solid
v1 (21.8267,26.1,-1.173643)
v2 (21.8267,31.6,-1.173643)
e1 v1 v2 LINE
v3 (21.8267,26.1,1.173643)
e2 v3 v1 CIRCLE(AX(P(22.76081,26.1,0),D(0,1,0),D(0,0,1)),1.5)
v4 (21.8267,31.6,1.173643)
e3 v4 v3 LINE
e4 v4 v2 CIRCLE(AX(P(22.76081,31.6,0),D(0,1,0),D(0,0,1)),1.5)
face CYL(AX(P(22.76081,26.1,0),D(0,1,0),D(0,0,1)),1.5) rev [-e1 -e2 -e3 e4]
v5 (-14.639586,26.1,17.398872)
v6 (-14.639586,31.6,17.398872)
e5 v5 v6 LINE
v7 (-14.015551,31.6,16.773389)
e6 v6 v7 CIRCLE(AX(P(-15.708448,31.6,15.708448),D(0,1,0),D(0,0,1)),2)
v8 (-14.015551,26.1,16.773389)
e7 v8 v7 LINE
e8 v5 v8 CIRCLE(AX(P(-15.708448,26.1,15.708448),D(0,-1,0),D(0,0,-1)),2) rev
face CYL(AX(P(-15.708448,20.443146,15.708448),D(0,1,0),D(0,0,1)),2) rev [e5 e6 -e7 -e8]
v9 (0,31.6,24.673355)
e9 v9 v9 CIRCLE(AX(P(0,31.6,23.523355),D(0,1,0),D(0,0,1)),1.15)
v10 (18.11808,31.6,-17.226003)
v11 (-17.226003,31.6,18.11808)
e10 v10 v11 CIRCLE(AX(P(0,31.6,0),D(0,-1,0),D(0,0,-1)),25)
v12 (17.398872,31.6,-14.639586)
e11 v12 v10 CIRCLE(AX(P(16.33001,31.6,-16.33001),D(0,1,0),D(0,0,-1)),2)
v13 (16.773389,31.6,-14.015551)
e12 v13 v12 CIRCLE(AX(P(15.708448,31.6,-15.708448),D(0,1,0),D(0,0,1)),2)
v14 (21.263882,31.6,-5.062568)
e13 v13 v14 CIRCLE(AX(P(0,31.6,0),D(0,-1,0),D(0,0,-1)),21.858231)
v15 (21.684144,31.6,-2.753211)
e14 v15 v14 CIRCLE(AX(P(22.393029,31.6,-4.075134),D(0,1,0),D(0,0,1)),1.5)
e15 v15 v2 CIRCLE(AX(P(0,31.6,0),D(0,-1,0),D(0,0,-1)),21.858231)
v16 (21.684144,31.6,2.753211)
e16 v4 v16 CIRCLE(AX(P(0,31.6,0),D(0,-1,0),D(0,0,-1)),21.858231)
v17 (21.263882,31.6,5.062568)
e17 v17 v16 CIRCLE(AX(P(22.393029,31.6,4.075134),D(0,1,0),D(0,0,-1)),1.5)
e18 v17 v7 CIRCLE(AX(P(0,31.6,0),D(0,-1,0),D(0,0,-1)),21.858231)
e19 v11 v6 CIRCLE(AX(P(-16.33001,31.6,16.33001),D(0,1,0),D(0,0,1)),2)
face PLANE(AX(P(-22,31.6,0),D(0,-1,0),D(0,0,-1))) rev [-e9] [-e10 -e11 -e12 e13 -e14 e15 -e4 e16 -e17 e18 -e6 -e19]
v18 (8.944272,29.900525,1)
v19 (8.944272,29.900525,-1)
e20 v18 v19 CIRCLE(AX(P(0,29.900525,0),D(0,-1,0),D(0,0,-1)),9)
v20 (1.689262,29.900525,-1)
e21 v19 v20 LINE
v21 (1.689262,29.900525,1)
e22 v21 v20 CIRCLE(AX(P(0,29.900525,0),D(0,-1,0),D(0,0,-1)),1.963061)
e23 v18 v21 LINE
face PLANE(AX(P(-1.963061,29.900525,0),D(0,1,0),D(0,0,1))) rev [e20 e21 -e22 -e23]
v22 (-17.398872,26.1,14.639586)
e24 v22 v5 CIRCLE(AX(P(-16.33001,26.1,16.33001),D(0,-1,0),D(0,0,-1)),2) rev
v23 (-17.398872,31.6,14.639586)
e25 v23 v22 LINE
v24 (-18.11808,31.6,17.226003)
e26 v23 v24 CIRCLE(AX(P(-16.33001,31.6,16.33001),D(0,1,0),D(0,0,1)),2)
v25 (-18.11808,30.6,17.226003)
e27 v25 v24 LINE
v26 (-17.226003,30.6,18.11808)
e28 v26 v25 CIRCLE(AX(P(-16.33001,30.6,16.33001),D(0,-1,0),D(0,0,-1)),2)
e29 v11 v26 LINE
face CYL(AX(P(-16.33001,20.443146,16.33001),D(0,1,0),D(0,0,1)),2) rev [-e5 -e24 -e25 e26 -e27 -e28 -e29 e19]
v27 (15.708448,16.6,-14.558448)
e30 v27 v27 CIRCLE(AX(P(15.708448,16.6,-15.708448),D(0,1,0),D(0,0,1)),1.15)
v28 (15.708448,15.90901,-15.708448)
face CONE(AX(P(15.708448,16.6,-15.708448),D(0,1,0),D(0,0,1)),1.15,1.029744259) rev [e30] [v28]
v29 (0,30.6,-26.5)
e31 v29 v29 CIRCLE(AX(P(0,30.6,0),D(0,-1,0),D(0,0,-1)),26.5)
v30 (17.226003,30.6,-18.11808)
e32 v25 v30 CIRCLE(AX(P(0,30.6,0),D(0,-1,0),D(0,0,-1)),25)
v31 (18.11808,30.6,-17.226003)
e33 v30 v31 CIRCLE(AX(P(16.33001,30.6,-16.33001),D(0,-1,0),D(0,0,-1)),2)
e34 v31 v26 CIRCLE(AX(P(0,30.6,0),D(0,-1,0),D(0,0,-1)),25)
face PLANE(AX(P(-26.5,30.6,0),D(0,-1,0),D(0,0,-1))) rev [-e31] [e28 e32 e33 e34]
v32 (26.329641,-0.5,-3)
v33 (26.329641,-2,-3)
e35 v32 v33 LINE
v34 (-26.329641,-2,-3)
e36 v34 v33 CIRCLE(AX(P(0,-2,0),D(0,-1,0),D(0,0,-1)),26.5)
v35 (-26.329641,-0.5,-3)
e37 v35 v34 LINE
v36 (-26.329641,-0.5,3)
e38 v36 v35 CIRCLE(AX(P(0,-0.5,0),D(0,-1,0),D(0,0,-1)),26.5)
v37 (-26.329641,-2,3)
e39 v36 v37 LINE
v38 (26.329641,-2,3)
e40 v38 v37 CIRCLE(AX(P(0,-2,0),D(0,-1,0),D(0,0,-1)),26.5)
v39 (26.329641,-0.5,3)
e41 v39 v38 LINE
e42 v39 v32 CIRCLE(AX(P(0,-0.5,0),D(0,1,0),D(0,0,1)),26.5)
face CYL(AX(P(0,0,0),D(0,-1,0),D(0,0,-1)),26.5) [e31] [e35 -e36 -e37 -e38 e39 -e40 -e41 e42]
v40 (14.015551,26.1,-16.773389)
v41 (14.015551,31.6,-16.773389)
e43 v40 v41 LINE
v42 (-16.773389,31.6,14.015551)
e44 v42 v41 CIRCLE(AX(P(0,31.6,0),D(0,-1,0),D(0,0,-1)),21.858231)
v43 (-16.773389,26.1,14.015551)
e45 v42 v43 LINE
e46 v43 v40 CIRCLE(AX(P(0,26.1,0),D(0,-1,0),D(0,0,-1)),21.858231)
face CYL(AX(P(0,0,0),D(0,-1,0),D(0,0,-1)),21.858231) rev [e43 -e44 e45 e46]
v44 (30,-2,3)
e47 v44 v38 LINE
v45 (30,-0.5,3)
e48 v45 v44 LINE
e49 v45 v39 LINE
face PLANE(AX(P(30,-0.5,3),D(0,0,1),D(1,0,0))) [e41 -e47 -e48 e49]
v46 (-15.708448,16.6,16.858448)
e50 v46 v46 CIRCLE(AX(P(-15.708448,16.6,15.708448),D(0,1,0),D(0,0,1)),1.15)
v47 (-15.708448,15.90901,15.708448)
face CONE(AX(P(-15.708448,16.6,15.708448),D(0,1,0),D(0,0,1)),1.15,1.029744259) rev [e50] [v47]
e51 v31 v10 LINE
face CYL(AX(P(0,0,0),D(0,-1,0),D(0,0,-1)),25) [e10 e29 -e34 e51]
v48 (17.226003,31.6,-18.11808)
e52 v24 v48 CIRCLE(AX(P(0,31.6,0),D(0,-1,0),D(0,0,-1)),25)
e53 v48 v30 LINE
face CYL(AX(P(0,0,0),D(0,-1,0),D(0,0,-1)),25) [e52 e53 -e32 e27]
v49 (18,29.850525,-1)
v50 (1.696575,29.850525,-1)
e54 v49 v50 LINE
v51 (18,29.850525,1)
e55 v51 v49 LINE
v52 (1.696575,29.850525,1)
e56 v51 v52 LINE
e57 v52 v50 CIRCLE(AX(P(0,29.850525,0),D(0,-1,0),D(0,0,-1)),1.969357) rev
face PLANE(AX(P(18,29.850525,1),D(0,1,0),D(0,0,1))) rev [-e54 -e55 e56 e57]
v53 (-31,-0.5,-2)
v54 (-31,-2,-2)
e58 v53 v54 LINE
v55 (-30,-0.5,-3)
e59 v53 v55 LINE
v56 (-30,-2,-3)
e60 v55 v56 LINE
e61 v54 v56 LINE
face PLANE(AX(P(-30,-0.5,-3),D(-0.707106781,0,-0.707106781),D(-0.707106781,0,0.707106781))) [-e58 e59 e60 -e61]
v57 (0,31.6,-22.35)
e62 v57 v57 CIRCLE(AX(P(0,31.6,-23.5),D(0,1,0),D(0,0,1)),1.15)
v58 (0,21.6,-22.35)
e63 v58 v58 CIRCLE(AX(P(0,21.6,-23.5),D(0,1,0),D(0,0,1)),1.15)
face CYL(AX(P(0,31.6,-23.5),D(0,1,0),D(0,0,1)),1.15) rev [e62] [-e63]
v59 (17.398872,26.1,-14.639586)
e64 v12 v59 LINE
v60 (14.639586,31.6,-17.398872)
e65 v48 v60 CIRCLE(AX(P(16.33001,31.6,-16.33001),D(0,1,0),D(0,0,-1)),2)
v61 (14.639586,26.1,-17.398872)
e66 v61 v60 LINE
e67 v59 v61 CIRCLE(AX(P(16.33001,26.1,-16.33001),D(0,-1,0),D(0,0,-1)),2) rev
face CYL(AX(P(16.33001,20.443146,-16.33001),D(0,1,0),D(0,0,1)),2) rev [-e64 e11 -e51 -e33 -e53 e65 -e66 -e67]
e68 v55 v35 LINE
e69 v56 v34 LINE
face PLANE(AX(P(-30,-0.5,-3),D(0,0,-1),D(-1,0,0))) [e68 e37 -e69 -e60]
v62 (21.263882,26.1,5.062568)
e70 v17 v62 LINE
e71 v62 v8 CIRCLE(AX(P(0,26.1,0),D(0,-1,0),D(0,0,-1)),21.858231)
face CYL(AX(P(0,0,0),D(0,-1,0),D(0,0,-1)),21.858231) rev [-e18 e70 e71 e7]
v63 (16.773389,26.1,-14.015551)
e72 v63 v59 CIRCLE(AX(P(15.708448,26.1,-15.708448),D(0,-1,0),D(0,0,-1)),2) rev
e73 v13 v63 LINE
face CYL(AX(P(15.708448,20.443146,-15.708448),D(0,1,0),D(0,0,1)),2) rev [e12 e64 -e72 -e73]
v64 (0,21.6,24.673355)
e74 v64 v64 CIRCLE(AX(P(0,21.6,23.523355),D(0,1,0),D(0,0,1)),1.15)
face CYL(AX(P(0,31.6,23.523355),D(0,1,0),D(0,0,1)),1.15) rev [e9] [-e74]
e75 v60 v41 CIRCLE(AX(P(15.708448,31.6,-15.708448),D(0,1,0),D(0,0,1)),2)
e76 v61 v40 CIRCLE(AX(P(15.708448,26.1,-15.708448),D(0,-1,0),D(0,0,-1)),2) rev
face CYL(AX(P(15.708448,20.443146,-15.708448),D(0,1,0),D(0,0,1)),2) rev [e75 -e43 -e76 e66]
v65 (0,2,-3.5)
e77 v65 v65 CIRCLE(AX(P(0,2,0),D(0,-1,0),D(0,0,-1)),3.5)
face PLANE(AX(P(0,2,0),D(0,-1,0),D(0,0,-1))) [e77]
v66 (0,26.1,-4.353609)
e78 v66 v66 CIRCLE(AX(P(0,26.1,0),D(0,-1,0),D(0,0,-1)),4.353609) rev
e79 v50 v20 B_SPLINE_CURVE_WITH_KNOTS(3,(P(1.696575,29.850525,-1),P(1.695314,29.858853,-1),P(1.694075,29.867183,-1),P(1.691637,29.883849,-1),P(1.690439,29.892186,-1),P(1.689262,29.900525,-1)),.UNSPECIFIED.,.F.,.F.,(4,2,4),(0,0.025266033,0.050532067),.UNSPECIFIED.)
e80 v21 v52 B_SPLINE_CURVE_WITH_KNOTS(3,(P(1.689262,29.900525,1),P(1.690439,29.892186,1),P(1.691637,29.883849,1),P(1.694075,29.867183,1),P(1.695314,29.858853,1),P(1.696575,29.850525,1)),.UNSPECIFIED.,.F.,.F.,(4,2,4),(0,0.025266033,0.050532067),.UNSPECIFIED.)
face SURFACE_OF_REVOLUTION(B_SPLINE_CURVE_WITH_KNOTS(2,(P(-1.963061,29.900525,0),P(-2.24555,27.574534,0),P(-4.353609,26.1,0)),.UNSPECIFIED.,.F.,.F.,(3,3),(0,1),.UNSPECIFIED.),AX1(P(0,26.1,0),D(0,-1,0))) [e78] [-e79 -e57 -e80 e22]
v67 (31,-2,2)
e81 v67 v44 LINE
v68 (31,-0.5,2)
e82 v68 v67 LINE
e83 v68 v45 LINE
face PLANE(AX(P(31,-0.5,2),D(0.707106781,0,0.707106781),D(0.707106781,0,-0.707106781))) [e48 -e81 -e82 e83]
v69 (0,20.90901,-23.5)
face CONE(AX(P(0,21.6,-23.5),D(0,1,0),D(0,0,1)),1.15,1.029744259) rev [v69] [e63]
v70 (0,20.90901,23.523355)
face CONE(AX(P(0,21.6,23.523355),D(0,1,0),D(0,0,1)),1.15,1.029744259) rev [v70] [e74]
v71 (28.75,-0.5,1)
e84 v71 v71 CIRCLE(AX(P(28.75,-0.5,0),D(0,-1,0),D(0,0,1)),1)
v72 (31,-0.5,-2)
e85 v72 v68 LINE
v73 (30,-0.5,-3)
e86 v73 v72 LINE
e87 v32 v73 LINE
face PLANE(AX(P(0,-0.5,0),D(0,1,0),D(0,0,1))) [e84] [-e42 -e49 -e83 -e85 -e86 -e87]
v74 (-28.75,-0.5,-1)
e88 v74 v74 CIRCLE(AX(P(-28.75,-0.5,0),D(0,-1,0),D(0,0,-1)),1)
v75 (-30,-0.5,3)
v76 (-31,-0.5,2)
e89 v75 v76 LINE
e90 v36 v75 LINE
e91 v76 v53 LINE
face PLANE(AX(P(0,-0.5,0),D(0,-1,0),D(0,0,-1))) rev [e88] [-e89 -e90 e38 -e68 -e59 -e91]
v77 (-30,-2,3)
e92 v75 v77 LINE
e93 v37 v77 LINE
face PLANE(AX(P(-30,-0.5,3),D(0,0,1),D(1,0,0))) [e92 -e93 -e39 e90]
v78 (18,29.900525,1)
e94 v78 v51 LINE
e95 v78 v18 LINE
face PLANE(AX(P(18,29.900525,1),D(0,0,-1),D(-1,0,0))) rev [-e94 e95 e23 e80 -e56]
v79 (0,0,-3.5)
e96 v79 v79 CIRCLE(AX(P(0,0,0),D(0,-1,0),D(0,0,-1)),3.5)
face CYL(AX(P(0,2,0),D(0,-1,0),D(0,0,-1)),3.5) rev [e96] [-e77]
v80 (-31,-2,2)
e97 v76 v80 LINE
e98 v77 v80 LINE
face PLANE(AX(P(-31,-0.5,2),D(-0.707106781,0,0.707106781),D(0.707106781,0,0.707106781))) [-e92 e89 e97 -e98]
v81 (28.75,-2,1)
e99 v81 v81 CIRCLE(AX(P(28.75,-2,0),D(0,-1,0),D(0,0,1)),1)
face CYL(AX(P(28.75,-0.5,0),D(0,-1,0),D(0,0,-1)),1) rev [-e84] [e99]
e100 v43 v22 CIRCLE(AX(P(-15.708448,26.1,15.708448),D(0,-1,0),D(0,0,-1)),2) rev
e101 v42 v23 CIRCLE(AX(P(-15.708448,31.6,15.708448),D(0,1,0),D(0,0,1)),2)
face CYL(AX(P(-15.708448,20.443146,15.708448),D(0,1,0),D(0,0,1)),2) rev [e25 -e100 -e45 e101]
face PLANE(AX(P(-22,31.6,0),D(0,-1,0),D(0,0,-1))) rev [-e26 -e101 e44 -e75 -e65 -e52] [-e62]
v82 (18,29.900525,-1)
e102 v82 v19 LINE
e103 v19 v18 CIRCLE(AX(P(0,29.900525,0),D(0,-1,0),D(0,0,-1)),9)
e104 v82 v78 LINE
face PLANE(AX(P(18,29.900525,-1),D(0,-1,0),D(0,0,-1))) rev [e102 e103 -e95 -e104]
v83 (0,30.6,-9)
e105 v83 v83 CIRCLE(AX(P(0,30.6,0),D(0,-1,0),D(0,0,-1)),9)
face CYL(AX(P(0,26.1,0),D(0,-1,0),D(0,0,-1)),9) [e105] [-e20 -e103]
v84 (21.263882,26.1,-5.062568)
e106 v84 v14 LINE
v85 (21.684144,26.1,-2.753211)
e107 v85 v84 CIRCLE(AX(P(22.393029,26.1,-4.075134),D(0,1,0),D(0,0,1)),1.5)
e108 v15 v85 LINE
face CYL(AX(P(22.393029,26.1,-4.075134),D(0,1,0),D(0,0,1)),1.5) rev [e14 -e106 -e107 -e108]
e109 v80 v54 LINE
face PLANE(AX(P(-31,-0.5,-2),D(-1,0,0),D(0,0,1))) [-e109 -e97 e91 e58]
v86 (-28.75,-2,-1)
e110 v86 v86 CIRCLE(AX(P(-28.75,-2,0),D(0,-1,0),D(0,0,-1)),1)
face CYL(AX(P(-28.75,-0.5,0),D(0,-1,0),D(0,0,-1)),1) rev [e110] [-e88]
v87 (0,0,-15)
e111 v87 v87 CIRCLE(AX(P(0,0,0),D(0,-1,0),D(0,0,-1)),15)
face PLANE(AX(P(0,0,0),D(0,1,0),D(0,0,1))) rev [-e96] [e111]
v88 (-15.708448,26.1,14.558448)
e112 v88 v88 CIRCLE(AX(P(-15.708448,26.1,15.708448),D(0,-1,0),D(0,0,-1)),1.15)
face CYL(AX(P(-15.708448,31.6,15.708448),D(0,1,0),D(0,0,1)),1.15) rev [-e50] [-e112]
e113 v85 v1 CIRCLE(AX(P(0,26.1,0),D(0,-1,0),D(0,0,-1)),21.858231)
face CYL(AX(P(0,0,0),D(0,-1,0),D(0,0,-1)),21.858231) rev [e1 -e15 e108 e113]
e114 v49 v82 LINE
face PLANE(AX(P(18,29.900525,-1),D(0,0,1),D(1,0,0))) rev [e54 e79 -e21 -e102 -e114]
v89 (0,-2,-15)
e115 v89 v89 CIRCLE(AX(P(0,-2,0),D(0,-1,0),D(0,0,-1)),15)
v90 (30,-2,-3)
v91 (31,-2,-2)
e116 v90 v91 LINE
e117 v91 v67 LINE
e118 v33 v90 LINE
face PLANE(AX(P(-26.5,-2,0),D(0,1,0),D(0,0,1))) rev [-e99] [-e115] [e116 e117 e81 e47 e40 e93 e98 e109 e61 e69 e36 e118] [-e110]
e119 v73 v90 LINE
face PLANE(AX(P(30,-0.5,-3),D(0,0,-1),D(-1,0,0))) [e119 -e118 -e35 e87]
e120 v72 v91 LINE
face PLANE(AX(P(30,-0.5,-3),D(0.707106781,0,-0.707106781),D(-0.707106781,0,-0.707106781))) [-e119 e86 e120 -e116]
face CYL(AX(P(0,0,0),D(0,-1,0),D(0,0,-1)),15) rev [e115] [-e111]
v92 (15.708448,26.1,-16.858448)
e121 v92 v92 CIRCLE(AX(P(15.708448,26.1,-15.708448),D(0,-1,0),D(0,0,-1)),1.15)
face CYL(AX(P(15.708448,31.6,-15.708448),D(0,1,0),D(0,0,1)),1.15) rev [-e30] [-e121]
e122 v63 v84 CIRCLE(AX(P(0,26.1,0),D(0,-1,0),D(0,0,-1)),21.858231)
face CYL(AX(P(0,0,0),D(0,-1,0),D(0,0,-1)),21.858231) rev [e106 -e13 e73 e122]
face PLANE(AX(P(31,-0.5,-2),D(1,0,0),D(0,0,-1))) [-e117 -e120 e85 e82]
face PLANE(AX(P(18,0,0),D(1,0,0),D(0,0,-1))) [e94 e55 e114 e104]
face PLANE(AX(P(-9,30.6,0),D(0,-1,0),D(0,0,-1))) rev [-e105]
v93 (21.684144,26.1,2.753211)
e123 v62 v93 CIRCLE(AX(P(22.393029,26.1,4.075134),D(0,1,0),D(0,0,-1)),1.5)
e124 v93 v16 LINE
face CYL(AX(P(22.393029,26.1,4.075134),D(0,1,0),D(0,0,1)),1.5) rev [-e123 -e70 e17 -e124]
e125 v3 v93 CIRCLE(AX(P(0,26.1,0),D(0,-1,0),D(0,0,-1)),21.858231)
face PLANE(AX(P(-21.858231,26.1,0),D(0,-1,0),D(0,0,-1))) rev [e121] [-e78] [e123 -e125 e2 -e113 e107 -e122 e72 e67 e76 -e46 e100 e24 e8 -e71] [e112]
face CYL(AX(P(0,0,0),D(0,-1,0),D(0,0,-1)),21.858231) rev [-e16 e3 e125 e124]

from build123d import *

# Parameters (mm, degrees)
SKETCH_2_R              = 1
EXTRUDE_1_DEPTH         = 1.5
SKETCH_4_R              = 3.5
CUT_EXTRUDE_1_DEPTH     = 2
HOLE_WIZARD_M2_21_D     = 2.3
HOLE_WIZARD_M2_21_DEPTH = 10
HOLE_WIZARD_M2_21_TIP   = 0.690989712
HOLE_WIZARD_M2_22_D     = 2.3
HOLE_WIZARD_M2_22_DEPTH = 10
HOLE_WIZARD_M2_22_TIP   = 0.690989712
SKETCH_18_R             = 2
CUT_EXTRUDE_3_DEPTH     = 5.5
HOLE_WIZARD_M2_23_D     = 2.3
HOLE_WIZARD_M2_23_DEPTH = 15
HOLE_WIZARD_M2_23_TIP   = 0.690989712
CUT_EXTRUDE_START       = -5.5
SKETCH_20_R             = 1.5
CUT_EXTRUDE_4_DEPTH     = 5.5
SKETCH_8_W              = 2
SKETCH_8_H              = 0.05
EXTRUDE_3_DEPTH         = 18
SKETCH_9_R              = 2
CUT_EXTRUDE_2_DEPTH     = 5.5


# Read off the part's stored shape, not the designer's step: Повернуть1
with BuildPart() as part:
    # Повернуть1 outline → Повернуть1 (revolve)
    with BuildSketch(Plane.XY):
        Polygon((0, 26.1), (0, 0), (15, 0), (15, -2), (26.5, -2), (26.5, 30.6), (25, 30.6), (25, 31.6), (21.858230866, 31.6), (21.858230866, 26.1), align=None)
    revolve(axis=Axis((0, 0, 0), (0, 1, 0)))

    # Эскиз2 → Бобышка-Вытянуть1 (add)
    # profile 1 of 2: a face of its own
    with BuildSketch(Plane.XZ.offset(2)):
        Polygon((-31, -2), (-31, 2), (-30, 3), (-26.329641091, 3), (-26.329641091, -3), (-30, -3), align=None)
        with Locations(Location((-28.75, 0, 0), (0, 0, 270))):
            Circle(SKETCH_2_R, mode=Mode.SUBTRACT)
    # profile 2 of 2: a face of its own
    with BuildSketch(Plane.XZ.offset(2)):
        Polygon((30, 3), (26.329641091, 3), (26.329641091, -3), (30, -3), (31, -2), (31, 2), align=None)
        with Locations(Location((28.75, 0, 0), (0, 0, 90))):
            Circle(SKETCH_2_R, mode=Mode.SUBTRACT)
    extrude(amount=-EXTRUDE_1_DEPTH)

    # Эскиз4 → Вырез-Вытянуть1 (cut)
    with BuildSketch(Plane.XZ):
        with Locations(Location((0, 0, 0), (0, 0, 270))):
            Circle(SKETCH_4_R)
    extrude(amount=-CUT_EXTRUDE_1_DEPTH, mode=Mode.SUBTRACT)

    # Эскиз7 → Повернуть2 (revolve)
    with BuildSketch(Plane.XY, mode=Mode.PRIVATE) as revolve_2_sk:
        with BuildLine():
            Line((-1.963060758, 29.900525332), (-9, 29.900525332))
            Line((-9, 29.900525332), (-9, 30.6))
            Line((-9, 30.6), (0, 30.6))
            Line((0, 30.6), (0, 26.1))
            Line((0, 26.1), (-4.353608906, 26.1))
            add(Edge.make_bspline(
                [(-1.963060758, 29.900525332), (-2.24555005, 27.574534407), (-4.353608906, 26.1)],
                knots=[0, 0, 0, 1, 1, 1], degree=2))
        make_face()
    revolve(revolve_2_sk.sketch.rotate(Axis((0, 26.1, 0), (0, 1, 0)), 270), axis=Axis((0, 26.1, 0), (0, 1, 0)))

    # Сверло под метчик  спиральное M2.21
    with Locations(Plane(origin=(0, 31.6, 0), x_dir=(1, 0, 0), z_dir=(0, 1, 0))):
        with Locations((0, -23.523355069)):
            Hole(HOLE_WIZARD_M2_21_D / 2, depth=HOLE_WIZARD_M2_21_DEPTH)
            with Locations((0, 0, -(HOLE_WIZARD_M2_21_DEPTH + HOLE_WIZARD_M2_21_TIP / 2))):  # 118° drill point
                Cone(0, HOLE_WIZARD_M2_21_D / 2, HOLE_WIZARD_M2_21_TIP, mode=Mode.SUBTRACT)

    # Сверло под метчик  спиральное M2.22
    with Locations(Plane(origin=(0, 31.6, -23.5), x_dir=(0, 0, 1), z_dir=(0, 1, 0))):
        with Locations((0, 0)):
            Hole(HOLE_WIZARD_M2_22_D / 2, depth=HOLE_WIZARD_M2_22_DEPTH)
            with Locations((0, 0, -(HOLE_WIZARD_M2_22_DEPTH + HOLE_WIZARD_M2_22_TIP / 2))):  # 118° drill point
                Cone(0, HOLE_WIZARD_M2_22_D / 2, HOLE_WIZARD_M2_22_TIP, mode=Mode.SUBTRACT)

    # Эскиз18 → Вырез-Вытянуть3 (cut)
    with BuildSketch(Plane(origin=(0, 31.6, 0), x_dir=(1, 0, 0), z_dir=(0, 1, 0))):
        with Locations((15.708448043, 15.708448043)):
            Circle(SKETCH_18_R)
        with Locations((-15.708448043, -15.708448043)):
            Circle(SKETCH_18_R)
    extrude(amount=-CUT_EXTRUDE_3_DEPTH, mode=Mode.SUBTRACT)

    # Сверло под метчик  спиральное M2.23
    with Locations(Plane(origin=(-15.708448043, 31.6, 15.708448043), x_dir=(0, 0, 1), z_dir=(0, 1, 0))):
        with Locations((0, 0), (-31.416896086, 31.416896086)):
            Hole(HOLE_WIZARD_M2_23_D / 2, depth=HOLE_WIZARD_M2_23_DEPTH)
            with Locations((0, 0, -(HOLE_WIZARD_M2_23_DEPTH + HOLE_WIZARD_M2_23_TIP / 2))):  # 118° drill point
                Cone(0, HOLE_WIZARD_M2_23_D / 2, HOLE_WIZARD_M2_23_TIP, mode=Mode.SUBTRACT)

    # Эскиз20 → Вырез-Вытянуть4 (cut)
    with BuildSketch(Plane(origin=(0, 31.6, 0), x_dir=(1, 0, 0), z_dir=(0, 1, 0)).offset(CUT_EXTRUDE_START)):
        with Locations((22.760809842, 0)):
            Circle(SKETCH_20_R)
        with Locations((22.393028951, 4.075134238)):
            Circle(SKETCH_20_R)
        with Locations((22.393028951, -4.075134238)):
            Circle(SKETCH_20_R)
    extrude(amount=CUT_EXTRUDE_4_DEPTH, mode=Mode.SUBTRACT)

    # Эскиз8 → Бобышка-Вытянуть3 (add)
    with BuildSketch(Plane(origin=(0, 0, 0), x_dir=(0, 0, -1), z_dir=(1, 0, 0))):
        with Locations((0, 29.875525332)):
            Rectangle(SKETCH_8_W, SKETCH_8_H)
    extrude(amount=EXTRUDE_3_DEPTH)

    # Эскиз9 → Вырез-Вытянуть2 (cut)
    with BuildSketch(Plane(origin=(0, 31.6, 0), x_dir=(1, 0, 0), z_dir=(0, 1, 0)).offset(CUT_EXTRUDE_START)):
        with Locations((-16.330009516, -16.330009516)):
            Circle(SKETCH_9_R)
        with Locations((16.330009516, 16.330009516)):
            Circle(SKETCH_9_R)
    extrude(amount=CUT_EXTRUDE_2_DEPTH, mode=Mode.SUBTRACT)


solid = part.part
